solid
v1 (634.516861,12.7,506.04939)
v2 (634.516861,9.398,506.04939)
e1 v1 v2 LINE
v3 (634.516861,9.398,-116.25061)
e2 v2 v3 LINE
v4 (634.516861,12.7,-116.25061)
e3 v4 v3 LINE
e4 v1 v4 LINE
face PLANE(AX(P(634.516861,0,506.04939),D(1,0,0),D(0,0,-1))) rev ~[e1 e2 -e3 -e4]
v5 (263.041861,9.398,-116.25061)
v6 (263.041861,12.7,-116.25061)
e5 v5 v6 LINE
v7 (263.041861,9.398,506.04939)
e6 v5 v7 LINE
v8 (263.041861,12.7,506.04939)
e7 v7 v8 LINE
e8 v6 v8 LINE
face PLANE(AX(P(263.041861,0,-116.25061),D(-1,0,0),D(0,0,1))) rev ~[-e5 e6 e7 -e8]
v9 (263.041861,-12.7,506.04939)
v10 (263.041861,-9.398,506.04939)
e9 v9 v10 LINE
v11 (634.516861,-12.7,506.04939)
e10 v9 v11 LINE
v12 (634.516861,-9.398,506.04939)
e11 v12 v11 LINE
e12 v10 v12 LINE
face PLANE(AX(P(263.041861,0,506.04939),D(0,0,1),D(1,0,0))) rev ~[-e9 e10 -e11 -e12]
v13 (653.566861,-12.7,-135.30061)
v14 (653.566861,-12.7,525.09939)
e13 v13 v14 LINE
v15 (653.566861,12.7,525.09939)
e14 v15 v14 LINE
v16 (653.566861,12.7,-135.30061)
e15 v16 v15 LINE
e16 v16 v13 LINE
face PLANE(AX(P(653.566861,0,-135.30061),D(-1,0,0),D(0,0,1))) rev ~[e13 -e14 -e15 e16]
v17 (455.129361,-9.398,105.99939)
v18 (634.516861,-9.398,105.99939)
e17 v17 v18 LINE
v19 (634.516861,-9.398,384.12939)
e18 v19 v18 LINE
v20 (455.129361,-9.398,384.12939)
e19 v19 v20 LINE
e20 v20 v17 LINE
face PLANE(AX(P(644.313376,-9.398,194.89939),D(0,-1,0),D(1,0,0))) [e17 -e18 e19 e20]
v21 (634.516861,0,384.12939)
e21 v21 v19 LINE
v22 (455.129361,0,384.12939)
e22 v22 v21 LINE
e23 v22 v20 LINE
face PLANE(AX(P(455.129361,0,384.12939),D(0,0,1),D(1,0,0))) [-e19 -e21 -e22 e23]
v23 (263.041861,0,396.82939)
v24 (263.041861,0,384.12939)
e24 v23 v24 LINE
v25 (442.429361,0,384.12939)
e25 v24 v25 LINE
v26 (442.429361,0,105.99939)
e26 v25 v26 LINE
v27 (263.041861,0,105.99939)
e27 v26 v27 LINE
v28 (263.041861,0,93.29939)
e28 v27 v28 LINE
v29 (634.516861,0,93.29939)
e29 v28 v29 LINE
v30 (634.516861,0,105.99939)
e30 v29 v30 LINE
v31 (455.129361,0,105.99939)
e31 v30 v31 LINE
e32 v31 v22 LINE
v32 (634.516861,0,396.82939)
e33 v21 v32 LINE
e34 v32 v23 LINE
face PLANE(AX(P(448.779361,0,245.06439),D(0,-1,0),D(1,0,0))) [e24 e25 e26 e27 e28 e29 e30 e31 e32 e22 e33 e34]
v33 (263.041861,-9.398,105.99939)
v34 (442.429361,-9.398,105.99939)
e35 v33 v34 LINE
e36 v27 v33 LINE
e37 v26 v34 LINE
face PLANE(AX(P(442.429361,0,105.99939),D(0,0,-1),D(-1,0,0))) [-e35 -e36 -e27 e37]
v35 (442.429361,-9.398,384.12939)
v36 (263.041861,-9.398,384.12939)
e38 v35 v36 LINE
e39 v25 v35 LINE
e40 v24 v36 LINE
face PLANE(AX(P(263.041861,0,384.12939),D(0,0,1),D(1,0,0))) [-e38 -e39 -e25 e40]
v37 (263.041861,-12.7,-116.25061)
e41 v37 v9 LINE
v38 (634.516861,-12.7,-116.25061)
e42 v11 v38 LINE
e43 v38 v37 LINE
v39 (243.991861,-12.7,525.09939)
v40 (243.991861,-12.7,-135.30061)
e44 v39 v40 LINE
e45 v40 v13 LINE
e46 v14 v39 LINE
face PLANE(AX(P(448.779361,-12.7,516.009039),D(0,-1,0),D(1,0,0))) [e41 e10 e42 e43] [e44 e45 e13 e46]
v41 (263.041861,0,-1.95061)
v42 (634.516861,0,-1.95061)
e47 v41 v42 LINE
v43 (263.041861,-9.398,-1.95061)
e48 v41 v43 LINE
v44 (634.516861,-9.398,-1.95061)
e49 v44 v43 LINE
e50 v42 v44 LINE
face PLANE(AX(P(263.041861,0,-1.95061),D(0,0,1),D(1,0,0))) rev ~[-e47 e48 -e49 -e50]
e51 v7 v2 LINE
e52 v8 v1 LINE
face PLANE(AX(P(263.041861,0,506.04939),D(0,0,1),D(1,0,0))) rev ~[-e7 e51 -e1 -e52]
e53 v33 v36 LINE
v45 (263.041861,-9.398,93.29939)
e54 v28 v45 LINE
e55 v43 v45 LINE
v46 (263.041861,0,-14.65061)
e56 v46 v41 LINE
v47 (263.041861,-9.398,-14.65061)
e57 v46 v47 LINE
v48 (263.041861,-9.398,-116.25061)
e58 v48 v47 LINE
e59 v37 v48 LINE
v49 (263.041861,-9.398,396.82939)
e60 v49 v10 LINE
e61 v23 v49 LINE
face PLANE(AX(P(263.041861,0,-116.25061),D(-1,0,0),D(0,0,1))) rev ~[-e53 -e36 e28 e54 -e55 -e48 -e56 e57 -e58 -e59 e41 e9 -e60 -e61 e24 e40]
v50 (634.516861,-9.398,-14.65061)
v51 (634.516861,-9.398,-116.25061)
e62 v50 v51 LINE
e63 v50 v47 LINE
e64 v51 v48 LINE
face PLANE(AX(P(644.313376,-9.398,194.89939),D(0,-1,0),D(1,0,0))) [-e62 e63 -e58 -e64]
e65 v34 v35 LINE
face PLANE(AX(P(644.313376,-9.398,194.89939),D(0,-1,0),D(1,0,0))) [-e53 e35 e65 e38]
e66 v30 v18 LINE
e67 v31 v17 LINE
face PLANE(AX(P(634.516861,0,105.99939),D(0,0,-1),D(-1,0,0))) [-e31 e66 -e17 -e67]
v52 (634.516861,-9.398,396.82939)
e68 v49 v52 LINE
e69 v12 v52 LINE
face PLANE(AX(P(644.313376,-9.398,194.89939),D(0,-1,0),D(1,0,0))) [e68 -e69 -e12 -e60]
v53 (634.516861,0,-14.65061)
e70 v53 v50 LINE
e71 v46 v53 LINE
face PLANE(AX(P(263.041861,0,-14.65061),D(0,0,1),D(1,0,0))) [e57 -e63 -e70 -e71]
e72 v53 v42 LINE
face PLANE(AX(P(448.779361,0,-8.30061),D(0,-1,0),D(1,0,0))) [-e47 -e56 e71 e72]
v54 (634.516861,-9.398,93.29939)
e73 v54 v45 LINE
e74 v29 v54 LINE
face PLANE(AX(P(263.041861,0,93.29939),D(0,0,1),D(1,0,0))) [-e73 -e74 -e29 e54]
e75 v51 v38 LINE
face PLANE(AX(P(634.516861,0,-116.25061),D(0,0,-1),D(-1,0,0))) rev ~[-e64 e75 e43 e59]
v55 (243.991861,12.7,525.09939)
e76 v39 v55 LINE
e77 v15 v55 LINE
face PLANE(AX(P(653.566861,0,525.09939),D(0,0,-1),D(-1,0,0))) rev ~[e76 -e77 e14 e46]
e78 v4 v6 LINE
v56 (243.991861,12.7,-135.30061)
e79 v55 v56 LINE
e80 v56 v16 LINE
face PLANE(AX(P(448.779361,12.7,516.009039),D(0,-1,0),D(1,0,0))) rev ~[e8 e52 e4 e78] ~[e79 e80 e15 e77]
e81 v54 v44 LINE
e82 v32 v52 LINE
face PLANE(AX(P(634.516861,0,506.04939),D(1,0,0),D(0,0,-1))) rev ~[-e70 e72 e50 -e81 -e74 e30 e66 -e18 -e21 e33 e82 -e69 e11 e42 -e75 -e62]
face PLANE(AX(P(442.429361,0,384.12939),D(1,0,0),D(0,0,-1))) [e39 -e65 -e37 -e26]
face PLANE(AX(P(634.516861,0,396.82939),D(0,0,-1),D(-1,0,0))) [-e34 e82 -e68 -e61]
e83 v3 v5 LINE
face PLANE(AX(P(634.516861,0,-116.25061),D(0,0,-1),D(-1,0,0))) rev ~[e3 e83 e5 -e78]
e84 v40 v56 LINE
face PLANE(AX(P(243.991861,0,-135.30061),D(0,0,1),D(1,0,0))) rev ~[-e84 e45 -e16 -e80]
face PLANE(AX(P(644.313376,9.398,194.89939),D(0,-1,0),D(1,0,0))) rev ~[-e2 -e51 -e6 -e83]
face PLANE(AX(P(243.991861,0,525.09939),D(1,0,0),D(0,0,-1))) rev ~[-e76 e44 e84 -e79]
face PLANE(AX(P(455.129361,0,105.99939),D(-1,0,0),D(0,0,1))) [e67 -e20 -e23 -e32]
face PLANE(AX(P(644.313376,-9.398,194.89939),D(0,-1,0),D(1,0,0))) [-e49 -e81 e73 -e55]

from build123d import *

# Parameters (mm, degrees)
F1_DEPTH      = 12.7
F1_DEPTH_BACK = 12.7
F0_W          = 371.475
F0_H          = 622.3
F2_DEPTH      = 9.398
F2_DEPTH_BACK = 9.398
F3_W          = 371.475
F3_H          = 12.7
F4_DEPTH      = 12.7


# Not quite as in the source:
# - a feature names something its author has since deleted; it is built from what else it names


with BuildPart() as f1:
    # F0 (on Front) → F1 (new body, two sides)
    with BuildSketch(Plane.XZ) as f1_sk:
        Polygon((263.0418609804, 506.0493900317), (634.5168609804, 506.0493900317), (653.5668609804, 525.0993900317), (243.9918609804, 525.0993900317), align=None)
        Polygon((653.5668609804, 525.0993900317), (634.5168609804, 506.0493900317), (634.5168609804, -116.2506099683), (653.5668609804, -135.3006099683), align=None)
        Polygon((653.5668609804, -135.3006099683), (634.5168609804, -116.2506099683), (263.0418609804, -116.2506099683), (243.9918609804, -135.3006099683), align=None)
        Polygon((263.0418609804, -116.2506099683), (263.0418609804, 506.0493900317), (243.9918609804, 525.0993900317), (243.9918609804, -135.3006099683), align=None)
    extrude(amount=-F1_DEPTH)
    extrude(f1_sk.sketch, amount=F1_DEPTH_BACK)

    # F0 (on Front) → F2 (join, two sides)
    with BuildSketch(Plane.XZ) as f2_sk:
        Polygon((653.5668609804, 525.0993900317), (634.5168609804, 506.0493900317), (634.5168609804, -116.2506099683), (653.5668609804, -135.3006099683), align=None)
        Polygon((263.0418609804, 506.0493900317), (634.5168609804, 506.0493900317), (653.5668609804, 525.0993900317), (243.9918609804, 525.0993900317), align=None)
        Polygon((653.5668609804, -135.3006099683), (634.5168609804, -116.2506099683), (263.0418609804, -116.2506099683), (243.9918609804, -135.3006099683), align=None)
        with Locations((448.7793609804, 194.8993900317)):
            Rectangle(F0_W, F0_H)
        Polygon((263.0418609804, -116.2506099683), (263.0418609804, 506.0493900317), (243.9918609804, 525.0993900317), (243.9918609804, -135.3006099683), align=None)
    extrude(amount=-F2_DEPTH)
    extrude(f2_sk.sketch, amount=F2_DEPTH_BACK)

    # F3 (on face) → F4 (cut)
    with BuildSketch(Plane.XZ):
        Polygon((455.1293609804, 105.9993900317), (455.1293609804, 384.1293900317), (634.5168609804, 384.1293900317), (634.5168609804, 396.8293900317), (263.0418609804, 396.8293900317), (263.0418609804, 384.1293900317), (442.4293609804, 384.1293900317), (442.4293609804, 105.9993900317), (263.0418609804, 105.9993900317), (263.0418609804, 93.2993900317), (634.5168609804, 93.2993900317), (634.5168609804, 105.9993900317), align=None)
        with Locations((448.7793609804, -8.3006099683)):
            Rectangle(F3_W, F3_H)
    extrude(amount=F4_DEPTH, mode=Mode.SUBTRACT)


solid = f1.part
